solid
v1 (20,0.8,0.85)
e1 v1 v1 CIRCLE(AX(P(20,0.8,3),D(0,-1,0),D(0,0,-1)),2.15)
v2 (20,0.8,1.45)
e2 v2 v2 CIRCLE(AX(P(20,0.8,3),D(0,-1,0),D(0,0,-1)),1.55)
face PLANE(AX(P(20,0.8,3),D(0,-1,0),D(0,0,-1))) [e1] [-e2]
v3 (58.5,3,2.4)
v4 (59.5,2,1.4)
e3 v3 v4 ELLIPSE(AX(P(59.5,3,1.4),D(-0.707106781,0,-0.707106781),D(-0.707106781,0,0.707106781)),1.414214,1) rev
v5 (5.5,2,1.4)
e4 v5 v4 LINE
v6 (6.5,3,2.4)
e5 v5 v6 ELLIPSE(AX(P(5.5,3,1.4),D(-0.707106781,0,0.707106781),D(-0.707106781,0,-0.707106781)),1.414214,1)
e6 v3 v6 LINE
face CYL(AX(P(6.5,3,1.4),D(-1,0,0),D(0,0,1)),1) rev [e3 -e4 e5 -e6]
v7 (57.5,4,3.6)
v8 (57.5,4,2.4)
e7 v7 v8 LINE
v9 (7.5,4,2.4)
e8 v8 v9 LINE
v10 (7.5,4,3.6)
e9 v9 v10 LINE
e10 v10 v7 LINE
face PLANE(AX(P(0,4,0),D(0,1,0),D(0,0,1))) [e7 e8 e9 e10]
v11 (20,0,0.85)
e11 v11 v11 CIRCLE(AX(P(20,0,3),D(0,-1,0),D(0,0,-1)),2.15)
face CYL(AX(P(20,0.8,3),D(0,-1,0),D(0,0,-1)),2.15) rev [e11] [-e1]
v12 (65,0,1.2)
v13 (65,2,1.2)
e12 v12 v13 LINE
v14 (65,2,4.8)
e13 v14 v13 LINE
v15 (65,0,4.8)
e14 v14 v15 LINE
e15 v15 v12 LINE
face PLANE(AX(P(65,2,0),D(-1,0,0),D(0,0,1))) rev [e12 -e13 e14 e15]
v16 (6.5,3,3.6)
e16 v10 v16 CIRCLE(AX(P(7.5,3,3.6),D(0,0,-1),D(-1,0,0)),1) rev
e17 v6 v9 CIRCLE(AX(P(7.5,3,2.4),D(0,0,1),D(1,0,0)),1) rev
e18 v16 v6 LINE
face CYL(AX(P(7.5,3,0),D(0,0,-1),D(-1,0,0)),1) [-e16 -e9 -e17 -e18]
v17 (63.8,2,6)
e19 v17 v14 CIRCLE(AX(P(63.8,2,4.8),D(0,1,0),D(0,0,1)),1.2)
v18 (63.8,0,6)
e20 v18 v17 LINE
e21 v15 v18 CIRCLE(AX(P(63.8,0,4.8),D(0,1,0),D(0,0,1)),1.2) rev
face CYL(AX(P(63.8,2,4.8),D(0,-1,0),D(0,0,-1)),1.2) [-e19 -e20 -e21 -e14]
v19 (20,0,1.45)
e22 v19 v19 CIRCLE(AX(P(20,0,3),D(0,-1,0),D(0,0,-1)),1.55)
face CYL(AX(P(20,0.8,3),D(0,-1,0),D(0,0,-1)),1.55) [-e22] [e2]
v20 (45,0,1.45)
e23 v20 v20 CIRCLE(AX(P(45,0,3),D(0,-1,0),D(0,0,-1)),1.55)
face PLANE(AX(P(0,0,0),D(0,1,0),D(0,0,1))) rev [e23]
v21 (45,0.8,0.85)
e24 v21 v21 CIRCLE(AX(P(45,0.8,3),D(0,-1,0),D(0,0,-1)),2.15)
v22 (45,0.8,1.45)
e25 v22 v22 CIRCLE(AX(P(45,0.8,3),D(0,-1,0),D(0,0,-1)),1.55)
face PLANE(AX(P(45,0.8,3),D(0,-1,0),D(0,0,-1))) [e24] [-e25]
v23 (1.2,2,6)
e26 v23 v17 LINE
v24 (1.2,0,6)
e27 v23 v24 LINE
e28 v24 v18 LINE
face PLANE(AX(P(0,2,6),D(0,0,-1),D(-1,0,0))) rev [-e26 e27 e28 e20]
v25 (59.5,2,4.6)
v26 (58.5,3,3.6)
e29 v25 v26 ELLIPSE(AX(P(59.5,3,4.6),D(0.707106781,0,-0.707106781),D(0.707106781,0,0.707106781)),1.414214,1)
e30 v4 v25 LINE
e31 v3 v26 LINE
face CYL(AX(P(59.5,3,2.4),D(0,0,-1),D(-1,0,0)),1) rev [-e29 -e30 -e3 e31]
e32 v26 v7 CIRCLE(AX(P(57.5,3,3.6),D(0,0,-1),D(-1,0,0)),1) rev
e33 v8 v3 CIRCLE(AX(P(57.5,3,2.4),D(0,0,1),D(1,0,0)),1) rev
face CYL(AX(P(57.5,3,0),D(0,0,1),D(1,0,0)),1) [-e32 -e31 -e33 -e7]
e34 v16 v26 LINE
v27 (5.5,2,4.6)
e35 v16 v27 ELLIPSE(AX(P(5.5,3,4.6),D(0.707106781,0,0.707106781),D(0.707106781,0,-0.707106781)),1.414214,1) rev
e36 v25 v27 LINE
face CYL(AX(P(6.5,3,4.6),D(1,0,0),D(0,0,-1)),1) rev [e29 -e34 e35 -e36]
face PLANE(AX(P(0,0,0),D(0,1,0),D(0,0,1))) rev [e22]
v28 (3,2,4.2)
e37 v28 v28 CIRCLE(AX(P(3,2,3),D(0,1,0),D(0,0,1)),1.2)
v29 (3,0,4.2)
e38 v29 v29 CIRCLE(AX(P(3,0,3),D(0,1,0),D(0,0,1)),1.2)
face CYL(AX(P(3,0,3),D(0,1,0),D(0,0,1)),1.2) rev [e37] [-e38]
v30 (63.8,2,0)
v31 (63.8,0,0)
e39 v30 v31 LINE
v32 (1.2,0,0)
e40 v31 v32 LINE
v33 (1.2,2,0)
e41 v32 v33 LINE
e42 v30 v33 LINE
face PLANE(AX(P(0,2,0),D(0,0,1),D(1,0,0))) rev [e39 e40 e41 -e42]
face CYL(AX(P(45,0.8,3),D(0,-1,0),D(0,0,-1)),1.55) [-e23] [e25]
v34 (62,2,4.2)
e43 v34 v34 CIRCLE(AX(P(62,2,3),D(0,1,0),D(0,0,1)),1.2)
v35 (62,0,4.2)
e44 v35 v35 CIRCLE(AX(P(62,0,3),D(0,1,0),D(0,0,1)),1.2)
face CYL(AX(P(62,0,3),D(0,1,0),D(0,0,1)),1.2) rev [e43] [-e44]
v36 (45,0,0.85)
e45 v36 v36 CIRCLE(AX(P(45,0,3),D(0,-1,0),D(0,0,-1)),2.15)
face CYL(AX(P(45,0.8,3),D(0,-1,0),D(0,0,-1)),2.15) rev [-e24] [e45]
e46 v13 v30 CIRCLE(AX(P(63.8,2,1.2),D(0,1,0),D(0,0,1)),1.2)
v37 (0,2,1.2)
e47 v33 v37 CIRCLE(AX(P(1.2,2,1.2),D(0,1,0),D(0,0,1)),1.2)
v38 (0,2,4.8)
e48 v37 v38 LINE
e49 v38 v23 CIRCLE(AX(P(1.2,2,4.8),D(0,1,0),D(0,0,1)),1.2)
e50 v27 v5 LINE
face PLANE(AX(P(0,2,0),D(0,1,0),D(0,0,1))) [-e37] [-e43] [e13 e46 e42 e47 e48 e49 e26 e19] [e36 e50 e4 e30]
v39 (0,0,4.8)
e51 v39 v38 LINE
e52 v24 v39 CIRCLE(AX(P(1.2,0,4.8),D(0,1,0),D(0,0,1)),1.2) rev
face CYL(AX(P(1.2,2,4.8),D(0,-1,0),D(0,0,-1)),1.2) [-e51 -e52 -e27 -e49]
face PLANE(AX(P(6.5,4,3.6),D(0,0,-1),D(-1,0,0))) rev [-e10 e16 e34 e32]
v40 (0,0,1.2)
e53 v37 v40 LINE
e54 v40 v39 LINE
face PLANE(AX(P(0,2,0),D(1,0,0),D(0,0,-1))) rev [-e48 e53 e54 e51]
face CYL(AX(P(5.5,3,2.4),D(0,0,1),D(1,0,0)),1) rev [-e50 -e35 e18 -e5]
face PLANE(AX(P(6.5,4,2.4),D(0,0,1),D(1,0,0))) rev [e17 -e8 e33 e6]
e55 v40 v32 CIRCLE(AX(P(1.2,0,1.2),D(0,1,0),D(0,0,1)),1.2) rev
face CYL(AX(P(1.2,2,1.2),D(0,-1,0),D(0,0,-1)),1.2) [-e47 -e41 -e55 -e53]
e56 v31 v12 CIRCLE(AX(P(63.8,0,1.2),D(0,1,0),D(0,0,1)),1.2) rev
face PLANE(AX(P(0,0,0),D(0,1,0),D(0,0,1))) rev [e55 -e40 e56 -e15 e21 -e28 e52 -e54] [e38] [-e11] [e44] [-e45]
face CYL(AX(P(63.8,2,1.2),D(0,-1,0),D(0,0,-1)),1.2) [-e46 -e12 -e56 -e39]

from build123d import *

# Parameters (mm, degrees)
SKETCH1_W           = 65
SKETCH1_H           = 6
BOSS_EXTRUDE1_DEPTH = 2
SKETCH2_R           = 1.2
CUT_EXTRUDE1_DEPTH  = 66.306967469
SKETCH3_W           = 52
SKETCH3_H           = 1.2
BOSS_EXTRUDE2_DEPTH = 2
FILLET1_R           = 1.2
FILLET3_R           = 1
FILLET4_R           = 1
FILLET5_R           = 1
SKETCH4_R           = 2.15
SKETCH4_R_2         = 1.55
CUT_EXTRUDE2_DEPTH  = 0.8


with BuildPart() as part:
    # Sketch1 → Boss-Extrude1 (new body)
    with BuildSketch(Plane(origin=(0, 0, 0), x_dir=(1, 0, 0), z_dir=(0, 1, 0))):
        with Locations((32.5, -3)):
            Rectangle(SKETCH1_W, SKETCH1_H)
    extrude(amount=BOSS_EXTRUDE1_DEPTH)

    # Sketch2 → Cut-Extrude1 (cut, through all)
    with BuildSketch(Plane(origin=(0, 2, 0), x_dir=(1, 0, 0), z_dir=(0, 1, 0))):
        with Locations(Location((62, -3, 0), (0, 0, 270))):
            Circle(SKETCH2_R)
        with Locations(Location((3, -3, 0), (0, 0, 270))):
            Circle(SKETCH2_R)
    extrude(amount=-CUT_EXTRUDE1_DEPTH, mode=Mode.SUBTRACT)

    # Sketch3 → Boss-Extrude2 (add)
    with BuildSketch(Plane(origin=(0, 2, 0), x_dir=(1, 0, 0), z_dir=(0, 1, 0))):
        with Locations((32.5, -3)):
            Rectangle(SKETCH3_W, SKETCH3_H)
    extrude(amount=BOSS_EXTRUDE2_DEPTH)

    # Fillet1
    fillet1_edges = [part.edges().sort_by_distance(p)[0] for p in [
        (0, 1, 0),
        (65, 1, 0),
        (65, 1, 6),
        (0, 1, 6),
    ]]
    fillet(fillet1_edges, radius=FILLET1_R)

    # Fillet3
    fillet3_edges = [part.edges().sort_by_distance(p)[0] for p in [
        (6.5, 4, 3),
        (58.5, 4, 3),
    ]]
    fillet(fillet3_edges, radius=FILLET3_R)

    # Fillet4
    fillet4_edges = [part.edges().sort_by_distance(p)[0] for p in [
        (32.5, 2, 3.6),
        (32.5, 2, 2.4),
    ]]
    fillet(fillet4_edges, radius=FILLET4_R)

    # Fillet5
    fillet5_edges = [part.edges().sort_by_distance(p)[0] for p in [
        (58.5, 2, 3),
        (6.5, 2, 3),
    ]]
    fillet(fillet5_edges, radius=FILLET5_R - 0.0001)  # a hair under: the kernel refuses the full size

    # Sketch4 → Cut-Extrude2 (cut)
    # profile 1 of 2: a face of its own
    with BuildSketch(Plane(origin=(0, 0, 0), x_dir=(-1, 0, 0), z_dir=(0, -1, 0))):
        with Locations(Location((-20, -3, 0), (0, 0, 90))):
            Circle(SKETCH4_R)
        with Locations(Location((-20, -3, 0), (0, 0, 90))):
            Circle(SKETCH4_R_2, mode=Mode.SUBTRACT)
    # profile 2 of 2: a face of its own
    with BuildSketch(Plane(origin=(0, 0, 0), x_dir=(-1, 0, 0), z_dir=(0, -1, 0))):
        with Locations(Location((-45, -3, 0), (0, 0, 90))):
            Circle(SKETCH4_R)
        with Locations(Location((-45, -3, 0), (0, 0, 90))):
            Circle(SKETCH4_R_2, mode=Mode.SUBTRACT)
    extrude(amount=-CUT_EXTRUDE2_DEPTH, mode=Mode.SUBTRACT)


solid = part.part
